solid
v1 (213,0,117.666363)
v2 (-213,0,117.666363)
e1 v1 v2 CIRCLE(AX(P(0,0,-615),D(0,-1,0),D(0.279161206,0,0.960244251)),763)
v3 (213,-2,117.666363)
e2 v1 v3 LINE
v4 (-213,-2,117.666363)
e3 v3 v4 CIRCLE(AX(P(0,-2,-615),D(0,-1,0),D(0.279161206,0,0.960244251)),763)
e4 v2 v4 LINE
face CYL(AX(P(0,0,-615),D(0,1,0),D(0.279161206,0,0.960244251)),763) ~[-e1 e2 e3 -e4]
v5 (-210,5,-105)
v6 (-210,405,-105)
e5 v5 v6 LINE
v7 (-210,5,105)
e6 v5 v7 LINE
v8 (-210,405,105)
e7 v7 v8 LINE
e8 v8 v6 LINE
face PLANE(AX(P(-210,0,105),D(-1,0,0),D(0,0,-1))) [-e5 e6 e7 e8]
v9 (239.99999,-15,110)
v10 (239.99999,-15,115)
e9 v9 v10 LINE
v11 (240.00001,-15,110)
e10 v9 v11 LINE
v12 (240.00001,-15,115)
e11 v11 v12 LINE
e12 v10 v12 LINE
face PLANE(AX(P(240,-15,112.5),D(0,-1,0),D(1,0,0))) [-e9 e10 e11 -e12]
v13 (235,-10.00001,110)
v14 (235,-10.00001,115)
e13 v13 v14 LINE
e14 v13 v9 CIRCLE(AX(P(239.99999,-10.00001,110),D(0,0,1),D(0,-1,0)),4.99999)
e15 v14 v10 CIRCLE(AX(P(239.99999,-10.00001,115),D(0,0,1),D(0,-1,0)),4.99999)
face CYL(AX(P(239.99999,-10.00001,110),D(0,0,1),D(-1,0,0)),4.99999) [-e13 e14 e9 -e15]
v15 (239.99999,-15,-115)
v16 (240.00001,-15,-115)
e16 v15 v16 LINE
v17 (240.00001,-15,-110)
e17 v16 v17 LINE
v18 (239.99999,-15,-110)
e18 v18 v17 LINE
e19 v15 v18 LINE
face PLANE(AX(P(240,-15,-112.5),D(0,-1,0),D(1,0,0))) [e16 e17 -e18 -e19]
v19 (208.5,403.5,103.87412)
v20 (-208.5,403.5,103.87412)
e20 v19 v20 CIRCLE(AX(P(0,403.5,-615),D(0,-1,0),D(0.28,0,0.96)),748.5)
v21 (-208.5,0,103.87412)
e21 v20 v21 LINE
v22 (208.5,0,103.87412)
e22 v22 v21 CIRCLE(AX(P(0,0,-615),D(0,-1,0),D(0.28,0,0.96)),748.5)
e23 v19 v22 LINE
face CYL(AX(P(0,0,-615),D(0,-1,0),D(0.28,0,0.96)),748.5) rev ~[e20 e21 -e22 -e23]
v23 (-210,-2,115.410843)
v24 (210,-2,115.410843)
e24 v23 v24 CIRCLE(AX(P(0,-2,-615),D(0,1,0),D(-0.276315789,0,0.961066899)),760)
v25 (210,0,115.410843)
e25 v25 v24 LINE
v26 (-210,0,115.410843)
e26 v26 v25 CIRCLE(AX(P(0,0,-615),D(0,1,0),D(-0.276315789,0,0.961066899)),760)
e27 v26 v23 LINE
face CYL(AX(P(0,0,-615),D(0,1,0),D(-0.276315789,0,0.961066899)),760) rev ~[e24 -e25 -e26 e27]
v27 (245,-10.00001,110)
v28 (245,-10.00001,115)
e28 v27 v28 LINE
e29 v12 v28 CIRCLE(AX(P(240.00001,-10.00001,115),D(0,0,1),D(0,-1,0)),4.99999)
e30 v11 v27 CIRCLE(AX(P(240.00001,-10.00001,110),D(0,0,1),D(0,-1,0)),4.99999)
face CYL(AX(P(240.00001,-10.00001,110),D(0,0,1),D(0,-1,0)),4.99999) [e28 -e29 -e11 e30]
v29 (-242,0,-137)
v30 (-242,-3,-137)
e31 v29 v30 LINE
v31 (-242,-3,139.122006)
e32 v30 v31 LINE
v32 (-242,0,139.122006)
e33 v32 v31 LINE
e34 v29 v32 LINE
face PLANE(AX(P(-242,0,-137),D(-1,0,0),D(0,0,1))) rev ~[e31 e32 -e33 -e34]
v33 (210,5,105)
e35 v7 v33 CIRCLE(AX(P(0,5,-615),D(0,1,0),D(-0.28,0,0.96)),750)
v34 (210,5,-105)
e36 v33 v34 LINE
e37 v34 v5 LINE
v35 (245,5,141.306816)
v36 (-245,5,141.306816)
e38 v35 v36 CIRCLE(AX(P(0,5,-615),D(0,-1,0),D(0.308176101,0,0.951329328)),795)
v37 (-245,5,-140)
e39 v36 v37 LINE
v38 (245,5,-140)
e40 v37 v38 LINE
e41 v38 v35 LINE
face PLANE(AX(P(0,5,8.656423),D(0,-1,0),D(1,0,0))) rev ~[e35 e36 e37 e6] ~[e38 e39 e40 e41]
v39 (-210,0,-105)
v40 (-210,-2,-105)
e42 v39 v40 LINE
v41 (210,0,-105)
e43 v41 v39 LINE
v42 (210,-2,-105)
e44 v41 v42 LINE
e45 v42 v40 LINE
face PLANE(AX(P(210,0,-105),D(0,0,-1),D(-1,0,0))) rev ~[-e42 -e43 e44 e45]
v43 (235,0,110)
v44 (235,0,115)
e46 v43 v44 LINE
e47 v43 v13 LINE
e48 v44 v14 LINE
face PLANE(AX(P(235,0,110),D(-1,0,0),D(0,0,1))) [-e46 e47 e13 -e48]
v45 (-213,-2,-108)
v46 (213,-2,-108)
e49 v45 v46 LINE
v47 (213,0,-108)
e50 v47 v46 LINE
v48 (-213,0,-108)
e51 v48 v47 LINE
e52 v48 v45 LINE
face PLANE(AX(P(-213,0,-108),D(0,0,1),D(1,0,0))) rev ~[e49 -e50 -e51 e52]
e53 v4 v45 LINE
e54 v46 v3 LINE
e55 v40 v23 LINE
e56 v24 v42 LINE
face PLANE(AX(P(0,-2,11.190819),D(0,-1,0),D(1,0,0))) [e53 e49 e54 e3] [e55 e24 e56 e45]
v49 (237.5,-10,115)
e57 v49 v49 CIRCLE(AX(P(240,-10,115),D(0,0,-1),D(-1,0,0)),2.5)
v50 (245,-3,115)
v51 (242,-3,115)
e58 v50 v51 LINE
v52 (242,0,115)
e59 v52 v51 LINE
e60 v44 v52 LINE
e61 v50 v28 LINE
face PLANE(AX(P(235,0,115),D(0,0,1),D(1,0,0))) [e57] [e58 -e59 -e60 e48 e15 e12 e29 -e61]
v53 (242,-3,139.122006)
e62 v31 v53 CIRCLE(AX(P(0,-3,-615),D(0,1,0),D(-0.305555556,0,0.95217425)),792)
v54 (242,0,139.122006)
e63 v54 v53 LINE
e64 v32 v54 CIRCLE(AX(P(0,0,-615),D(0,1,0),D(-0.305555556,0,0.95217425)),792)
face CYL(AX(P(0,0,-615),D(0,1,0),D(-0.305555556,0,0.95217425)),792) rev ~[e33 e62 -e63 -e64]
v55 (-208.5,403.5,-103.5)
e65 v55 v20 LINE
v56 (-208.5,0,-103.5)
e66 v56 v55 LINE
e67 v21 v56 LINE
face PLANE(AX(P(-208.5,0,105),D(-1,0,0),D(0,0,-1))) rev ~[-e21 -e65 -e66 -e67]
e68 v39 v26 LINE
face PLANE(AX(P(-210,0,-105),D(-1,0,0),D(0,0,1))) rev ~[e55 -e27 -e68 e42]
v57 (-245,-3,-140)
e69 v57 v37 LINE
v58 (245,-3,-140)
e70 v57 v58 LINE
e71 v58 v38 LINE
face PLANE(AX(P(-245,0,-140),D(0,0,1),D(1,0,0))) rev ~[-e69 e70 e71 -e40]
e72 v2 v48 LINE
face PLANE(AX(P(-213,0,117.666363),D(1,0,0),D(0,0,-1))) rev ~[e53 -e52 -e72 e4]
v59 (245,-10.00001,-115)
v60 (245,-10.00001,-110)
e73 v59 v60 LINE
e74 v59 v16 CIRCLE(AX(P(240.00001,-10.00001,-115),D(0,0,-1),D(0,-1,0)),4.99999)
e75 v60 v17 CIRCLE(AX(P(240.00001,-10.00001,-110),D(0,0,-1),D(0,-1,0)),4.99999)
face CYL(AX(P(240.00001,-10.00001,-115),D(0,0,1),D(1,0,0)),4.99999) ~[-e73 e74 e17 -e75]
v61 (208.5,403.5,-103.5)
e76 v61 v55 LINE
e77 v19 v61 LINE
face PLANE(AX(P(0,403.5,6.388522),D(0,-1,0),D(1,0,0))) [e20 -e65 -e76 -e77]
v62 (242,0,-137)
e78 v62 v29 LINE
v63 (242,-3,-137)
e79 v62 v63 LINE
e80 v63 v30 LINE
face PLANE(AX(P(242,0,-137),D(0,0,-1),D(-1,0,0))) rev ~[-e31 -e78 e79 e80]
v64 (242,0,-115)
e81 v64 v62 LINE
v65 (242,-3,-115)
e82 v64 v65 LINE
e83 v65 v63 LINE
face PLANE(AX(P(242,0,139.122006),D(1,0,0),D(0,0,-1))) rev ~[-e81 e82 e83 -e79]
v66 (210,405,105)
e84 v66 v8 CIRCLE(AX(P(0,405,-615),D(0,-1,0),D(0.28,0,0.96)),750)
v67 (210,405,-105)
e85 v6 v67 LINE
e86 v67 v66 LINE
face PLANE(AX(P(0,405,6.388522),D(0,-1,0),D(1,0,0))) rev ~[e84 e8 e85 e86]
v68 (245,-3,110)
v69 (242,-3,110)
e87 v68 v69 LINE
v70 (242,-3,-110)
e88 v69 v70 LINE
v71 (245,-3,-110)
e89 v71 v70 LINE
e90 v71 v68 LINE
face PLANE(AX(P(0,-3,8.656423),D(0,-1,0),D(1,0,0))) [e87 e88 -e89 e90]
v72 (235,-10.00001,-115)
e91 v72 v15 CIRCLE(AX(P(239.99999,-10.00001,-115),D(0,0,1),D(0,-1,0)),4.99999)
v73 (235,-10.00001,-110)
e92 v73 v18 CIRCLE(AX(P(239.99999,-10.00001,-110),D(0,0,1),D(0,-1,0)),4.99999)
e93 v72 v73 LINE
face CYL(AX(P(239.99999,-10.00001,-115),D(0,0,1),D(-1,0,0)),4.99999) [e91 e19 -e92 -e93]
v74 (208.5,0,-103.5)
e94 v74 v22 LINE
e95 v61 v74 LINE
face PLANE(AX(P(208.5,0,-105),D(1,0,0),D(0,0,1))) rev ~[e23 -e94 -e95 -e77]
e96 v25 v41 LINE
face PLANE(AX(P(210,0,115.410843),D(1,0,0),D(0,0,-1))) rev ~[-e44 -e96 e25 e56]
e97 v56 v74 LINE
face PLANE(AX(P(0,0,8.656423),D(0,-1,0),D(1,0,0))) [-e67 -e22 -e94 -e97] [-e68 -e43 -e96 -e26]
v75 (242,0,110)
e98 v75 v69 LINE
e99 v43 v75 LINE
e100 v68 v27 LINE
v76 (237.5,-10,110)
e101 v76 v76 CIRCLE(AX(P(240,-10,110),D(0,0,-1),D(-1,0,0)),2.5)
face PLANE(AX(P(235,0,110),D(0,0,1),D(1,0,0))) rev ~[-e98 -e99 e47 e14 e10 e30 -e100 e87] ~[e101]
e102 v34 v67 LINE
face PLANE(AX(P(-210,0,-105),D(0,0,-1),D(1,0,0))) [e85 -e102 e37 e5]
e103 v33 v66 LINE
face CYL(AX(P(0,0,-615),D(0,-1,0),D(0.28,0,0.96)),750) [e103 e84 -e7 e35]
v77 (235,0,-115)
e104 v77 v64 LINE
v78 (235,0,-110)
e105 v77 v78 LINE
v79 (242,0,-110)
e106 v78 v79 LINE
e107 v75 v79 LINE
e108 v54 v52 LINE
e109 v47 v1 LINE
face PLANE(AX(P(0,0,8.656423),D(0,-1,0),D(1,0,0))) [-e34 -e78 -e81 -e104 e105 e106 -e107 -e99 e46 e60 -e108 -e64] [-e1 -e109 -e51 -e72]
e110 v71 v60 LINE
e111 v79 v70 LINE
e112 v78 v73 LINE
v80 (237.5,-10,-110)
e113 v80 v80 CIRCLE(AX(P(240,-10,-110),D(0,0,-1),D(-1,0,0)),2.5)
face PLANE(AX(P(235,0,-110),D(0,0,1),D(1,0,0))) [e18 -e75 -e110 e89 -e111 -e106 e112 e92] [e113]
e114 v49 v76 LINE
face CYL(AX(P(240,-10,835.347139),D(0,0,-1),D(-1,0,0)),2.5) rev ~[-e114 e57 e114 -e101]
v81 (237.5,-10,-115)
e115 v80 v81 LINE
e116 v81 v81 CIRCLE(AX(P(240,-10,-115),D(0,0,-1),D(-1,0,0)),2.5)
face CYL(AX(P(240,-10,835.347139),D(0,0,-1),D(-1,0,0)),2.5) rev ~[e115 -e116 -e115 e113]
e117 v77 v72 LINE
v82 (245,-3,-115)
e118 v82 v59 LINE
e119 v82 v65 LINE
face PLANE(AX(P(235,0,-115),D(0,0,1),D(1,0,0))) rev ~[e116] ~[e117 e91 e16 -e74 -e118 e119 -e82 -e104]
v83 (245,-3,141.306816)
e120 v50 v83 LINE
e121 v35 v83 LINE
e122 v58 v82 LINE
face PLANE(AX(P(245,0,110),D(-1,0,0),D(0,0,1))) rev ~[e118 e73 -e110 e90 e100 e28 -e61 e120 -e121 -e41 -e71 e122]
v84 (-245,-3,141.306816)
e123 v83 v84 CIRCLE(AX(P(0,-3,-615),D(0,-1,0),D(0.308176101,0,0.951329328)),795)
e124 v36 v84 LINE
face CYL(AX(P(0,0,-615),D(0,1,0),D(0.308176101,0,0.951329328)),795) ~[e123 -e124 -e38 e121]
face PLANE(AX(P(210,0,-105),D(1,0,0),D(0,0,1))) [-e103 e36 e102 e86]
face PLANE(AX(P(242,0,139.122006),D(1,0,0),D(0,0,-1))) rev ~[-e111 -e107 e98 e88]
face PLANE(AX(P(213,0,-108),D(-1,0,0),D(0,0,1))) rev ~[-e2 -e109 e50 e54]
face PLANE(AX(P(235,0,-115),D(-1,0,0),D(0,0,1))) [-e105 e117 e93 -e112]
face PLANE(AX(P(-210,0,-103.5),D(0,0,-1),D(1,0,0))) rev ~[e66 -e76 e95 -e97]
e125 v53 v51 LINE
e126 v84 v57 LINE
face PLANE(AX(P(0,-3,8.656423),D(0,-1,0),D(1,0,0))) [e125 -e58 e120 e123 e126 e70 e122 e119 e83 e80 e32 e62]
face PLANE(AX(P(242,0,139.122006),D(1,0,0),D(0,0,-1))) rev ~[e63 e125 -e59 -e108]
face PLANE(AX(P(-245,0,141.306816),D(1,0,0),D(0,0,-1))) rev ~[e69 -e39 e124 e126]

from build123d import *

# Parameters (mm, degrees)
F1_DEPTH = 405
F2_T     = -1.5
F3_DEPTH = 5
F5_DEPTH = 3
F6_DEPTH = 2
F7_W     = 10
F7_H     = 5
F8_DEPTH = 15
F9_R     = 4.99999
F11_D    = 5


# Not quite as in the source:
# - a fillet or chamfer is up to 0.001 mm smaller than in the source, because OpenCascade refuses the exact size


with BuildPart() as f1:
    # F0 (on Front) → F1 (new body)
    with BuildSketch(Plane.XZ):
        with BuildLine():
            Line((-210, -105), (210, -105))
            Line((210, -105), (210, 105))
            ThreePointArc((210, 105), (0, 135), (-210, 105))
            Line((-210, 105), (-210, -105))
        make_face()
    extrude(amount=-F1_DEPTH)

    # F2
    f2_openings = [f1.faces().sort_by_distance(p)[0] for p in [
        (0, 0, 10.213522),
    ]]
    offset(amount=F2_T, openings=f2_openings)

    # F0 (on Front) → F3 (join)
    with BuildSketch(Plane.XZ):
        with BuildLine():
            ThreePointArc((245, 141.3068160476), (0, 180), (-245, 141.3068160476))
            Line((-245, 141.3068160476), (-245, -140))
            Line((-245, -140), (245, -140))
            Line((245, -140), (245, 141.3068160476))
        make_face()
        with BuildLine():
            Line((210, 105), (210, -105))
            Line((210, -105), (-210, -105))
            Line((-210, -105), (-210, 105))
            ThreePointArc((-210, 105), (0, 135), (210, 105))
        make_face(mode=Mode.SUBTRACT)
    extrude(amount=-F3_DEPTH)

    # F4 (on face) → F5 (join)
    with BuildSketch(Plane.XZ):
        with BuildLine():
            Line((245, -140), (245, 141.3068160476))
            ThreePointArc((245, 141.3068160476), (0, 180), (-245, 141.3068160476))
            Line((-245, 141.3068160476), (-245, -140))
            Line((-245, -140), (245, -140))
        make_face()
        with BuildLine():
            Line((-242, -137), (-242, 139.1220060441))
            ThreePointArc((-242, 139.1220060441), (0, 177), (242, 139.1220060441))
            Line((242, 139.1220060441), (242, -137))
            Line((242, -137), (-242, -137))
        make_face(mode=Mode.SUBTRACT)
    extrude(amount=F5_DEPTH)

    # F4 (on face) → F6 (join)
    with BuildSketch(Plane.XZ):
        with BuildLine():
            ThreePointArc((213, 117.6663633606), (0, 148), (-213, 117.6663633606))
            Line((-213, 117.6663633606), (-213, -108))
            Line((-213, -108), (213, -108))
            Line((213, -108), (213, 117.6663633606))
        make_face()
        with BuildLine():
            ThreePointArc((-210, 115.410843293), (0, 145), (210, 115.410843293))
            Line((210, 115.410843293), (210, 105))
            Line((210, 105), (210, -105))
            Line((210, -105), (-210, -105))
            Line((-210, -105), (-210, 105))
            Line((-210, 105), (-210, 115.410843293))
        make_face(mode=Mode.SUBTRACT)
    extrude(amount=F6_DEPTH)

    # F7 (on face) → F8 (join)
    with BuildSketch(Plane.XZ):
        with Locations((240, 112.5)):
            Rectangle(F7_W, F7_H)
        with Locations((240, -112.5)):
            Rectangle(F7_W, F7_H)
    extrude(amount=F8_DEPTH)

    # F9 (radius 5 in the source; OpenCascade refuses exactly that, so slightly less here)
    f9_edges = [f1.edges().sort_by_distance(p)[0] for p in [
        (245, -15, 112.5),
        (235, -15, 112.5),
        (245, -15, -112.5),
        (235, -15, -112.5),
    ]]
    fillet(f9_edges, radius=F9_R)

    # F11 (through all)
    with Locations(Plane.XY.offset(115)):
        with Locations((240, -10)):
            Hole(F11_D / 2)


solid = f1.part
